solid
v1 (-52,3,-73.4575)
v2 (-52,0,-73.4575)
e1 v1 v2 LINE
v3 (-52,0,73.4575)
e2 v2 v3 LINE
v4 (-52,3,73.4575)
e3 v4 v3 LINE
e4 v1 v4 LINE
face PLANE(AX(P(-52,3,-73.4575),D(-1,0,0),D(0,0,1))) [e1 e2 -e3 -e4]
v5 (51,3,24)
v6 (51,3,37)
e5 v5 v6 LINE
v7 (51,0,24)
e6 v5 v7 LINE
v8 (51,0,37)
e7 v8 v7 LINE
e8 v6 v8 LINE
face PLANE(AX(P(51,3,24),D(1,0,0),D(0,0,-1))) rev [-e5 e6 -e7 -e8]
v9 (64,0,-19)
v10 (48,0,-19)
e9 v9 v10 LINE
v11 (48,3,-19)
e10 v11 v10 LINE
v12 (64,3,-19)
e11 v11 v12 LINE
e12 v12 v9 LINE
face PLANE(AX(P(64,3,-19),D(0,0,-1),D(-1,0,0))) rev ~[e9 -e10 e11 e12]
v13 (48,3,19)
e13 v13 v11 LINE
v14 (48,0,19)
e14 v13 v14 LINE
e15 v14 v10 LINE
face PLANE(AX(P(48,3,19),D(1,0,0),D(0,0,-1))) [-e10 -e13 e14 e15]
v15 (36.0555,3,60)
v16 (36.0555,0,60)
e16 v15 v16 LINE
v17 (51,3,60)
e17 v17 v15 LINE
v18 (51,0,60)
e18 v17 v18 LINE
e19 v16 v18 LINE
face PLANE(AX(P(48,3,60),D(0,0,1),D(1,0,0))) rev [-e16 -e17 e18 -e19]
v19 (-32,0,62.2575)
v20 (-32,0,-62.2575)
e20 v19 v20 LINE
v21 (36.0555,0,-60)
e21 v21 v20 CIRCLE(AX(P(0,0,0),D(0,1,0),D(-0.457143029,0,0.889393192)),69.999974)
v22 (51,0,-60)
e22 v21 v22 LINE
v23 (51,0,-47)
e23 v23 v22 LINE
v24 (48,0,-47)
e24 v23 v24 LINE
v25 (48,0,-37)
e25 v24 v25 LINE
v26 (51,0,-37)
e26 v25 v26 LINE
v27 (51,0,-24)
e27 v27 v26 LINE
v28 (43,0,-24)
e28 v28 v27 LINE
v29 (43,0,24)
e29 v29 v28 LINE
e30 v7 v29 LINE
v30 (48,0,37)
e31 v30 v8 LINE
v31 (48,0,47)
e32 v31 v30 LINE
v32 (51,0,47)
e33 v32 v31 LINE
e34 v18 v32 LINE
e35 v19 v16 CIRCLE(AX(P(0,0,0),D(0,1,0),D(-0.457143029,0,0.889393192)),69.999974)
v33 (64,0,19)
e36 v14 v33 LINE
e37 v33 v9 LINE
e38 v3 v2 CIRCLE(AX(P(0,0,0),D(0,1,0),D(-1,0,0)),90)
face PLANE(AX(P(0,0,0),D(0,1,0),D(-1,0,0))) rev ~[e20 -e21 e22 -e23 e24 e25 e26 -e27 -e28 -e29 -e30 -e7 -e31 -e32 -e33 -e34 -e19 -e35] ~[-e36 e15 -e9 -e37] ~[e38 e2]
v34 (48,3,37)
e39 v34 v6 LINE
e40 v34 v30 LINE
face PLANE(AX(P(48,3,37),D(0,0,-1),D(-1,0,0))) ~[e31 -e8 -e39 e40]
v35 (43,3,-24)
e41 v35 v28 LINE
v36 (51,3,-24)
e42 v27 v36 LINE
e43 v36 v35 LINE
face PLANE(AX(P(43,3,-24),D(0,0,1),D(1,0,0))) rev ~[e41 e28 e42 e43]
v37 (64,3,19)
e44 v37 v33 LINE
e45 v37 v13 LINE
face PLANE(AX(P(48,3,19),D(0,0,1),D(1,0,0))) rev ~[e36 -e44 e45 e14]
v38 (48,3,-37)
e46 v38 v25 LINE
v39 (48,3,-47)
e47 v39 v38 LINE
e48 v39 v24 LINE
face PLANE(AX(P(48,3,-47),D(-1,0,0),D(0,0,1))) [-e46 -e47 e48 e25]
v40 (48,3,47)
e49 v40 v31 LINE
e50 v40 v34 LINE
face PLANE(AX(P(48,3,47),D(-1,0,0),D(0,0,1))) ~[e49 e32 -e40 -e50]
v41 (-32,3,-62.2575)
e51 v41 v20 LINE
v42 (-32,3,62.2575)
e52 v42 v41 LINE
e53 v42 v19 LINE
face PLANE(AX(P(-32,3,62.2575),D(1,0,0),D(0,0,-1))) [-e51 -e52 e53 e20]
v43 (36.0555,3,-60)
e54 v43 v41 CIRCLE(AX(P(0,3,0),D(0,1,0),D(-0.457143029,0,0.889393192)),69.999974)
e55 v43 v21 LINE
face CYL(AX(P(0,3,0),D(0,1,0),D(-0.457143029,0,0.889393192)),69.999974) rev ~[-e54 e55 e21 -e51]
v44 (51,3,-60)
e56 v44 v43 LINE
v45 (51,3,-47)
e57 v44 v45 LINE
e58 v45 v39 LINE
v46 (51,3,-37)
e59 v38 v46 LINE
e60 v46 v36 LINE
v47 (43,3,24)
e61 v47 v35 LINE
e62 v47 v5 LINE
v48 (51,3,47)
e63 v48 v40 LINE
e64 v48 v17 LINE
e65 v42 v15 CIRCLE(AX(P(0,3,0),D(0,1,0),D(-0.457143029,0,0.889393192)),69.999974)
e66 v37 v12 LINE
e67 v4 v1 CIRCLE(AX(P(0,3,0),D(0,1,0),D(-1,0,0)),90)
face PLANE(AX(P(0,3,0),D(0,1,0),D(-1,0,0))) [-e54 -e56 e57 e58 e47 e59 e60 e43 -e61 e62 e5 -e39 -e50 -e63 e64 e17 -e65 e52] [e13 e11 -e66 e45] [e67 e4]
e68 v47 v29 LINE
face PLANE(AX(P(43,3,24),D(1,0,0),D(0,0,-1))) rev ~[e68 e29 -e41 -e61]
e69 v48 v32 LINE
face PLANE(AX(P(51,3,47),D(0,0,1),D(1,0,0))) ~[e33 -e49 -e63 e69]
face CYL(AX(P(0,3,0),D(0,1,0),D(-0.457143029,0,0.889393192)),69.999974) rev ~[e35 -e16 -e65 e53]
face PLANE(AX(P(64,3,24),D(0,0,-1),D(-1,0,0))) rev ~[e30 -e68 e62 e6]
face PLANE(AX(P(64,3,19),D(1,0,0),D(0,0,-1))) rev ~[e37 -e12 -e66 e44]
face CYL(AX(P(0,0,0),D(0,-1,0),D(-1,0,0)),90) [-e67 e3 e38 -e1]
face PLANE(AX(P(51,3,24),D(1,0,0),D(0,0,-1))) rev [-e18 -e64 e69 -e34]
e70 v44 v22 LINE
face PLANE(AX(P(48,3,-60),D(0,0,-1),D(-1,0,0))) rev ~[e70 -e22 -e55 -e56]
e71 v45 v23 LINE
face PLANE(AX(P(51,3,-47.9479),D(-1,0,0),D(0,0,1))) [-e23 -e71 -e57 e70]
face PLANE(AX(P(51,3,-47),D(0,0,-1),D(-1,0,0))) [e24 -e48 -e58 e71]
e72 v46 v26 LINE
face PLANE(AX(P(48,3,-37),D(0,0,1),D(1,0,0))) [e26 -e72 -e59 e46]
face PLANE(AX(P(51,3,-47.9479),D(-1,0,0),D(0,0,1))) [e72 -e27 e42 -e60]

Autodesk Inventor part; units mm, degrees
ref_plane "YZ Plane" through (0, 0, 0) normal (1, 0, 0) x (0, 1, 0)
ref_plane "XZ Plane" through (0, 0, 0) normal (0, 1, 0) x (-1, 0, 0)
ref_plane "XY Plane" through (0, 0, 0) normal (0, 0, 1) x (1, 0, 0)
sketch "Sketch1" plane through (0, 0, 0) normal (0, 1, 0) x (-1, 0, 0)
  circle A0 centre (0, 0) radius 90
  line L0 (55, -71.239) -> (55, 71.239)
  dimension "d0" = 180
  dimension "d1" = 55
extrude "Extrusion1" add sketch "Sketch1" along normal blind 3 contours L0 A0 picked at (6.6667, 0)
sketch "Sketch2" plane through (0, 3, 0) normal (0, 1, 0) x (1, 0, 0)
  arc A0 (-55, -71.239) -> (-55, 71.239) centre (0, 0) ccw projected
  line L0 (-52, 73.4575) -> (-52, -73.4575)
  line L1 (-55, 71.239) -> (-55, -71.239) projected
  dimension "d4" = 3
extrude "Extrusion2" cut sketch "Sketch2" against normal blind 3 contours L1 A0 L0
sketch "Sketch3" plane through (0, 3, 0) normal (0, 1, 0) x (1, 0, 0)
  line L0 (-52, 73.4575) -> (-52, -73.4575) projected
  arc A0 (-52, -73.4575) -> (-52, 73.4575) centre (0, 0) ccw projected
  line L1 (-32, -62.2575) -> (-32, 62.2575)
  arc A1 (-32, -62.2575) -> (-32, 62.2575) centre (0, 0) ccw
  dimension "d7" = 20
extrude "Extrusion3" cut sketch "Sketch3" against normal blind 3 contours L1 A1
sketch "Sketch4" plane through (0, 3, 0) normal (0, 1, 0) x (1, 0, 0)
  arc A0 (-32, -62.2575) -> (-32, 62.2575) centre (0, 0) ccw projected
  line L0 (51, -47.9479) -> (76.1643, -47.9479)
  line L1 (76.1643, -47.9479) -> (76.1643, 47.9479)
  line L2 (76.1643, 47.9479) -> (51, 47.9479)
  line L3 (51, 47.9479) -> (51, -47.9479)
  line L4 (-52, 73.4575) -> (-52, -73.4575) projected
  arc A1 (-52, -73.4575) -> (-52, 73.4575) centre (0, 0) ccw projected
  dimension "d10" = 103
extrude "Extrusion4" add sketch "Sketch4" against normal blind 3 contours L3 A0
sketch "Sketch5" plane through (0, 3, 0) normal (0, 1, 0) x (1, 0, 0)
  line L0 (48, -19) -> (64, -19)
  line L1 (64, -19) -> (64, 19)
  line L2 (64, 19) -> (48, 19)
  line L3 (48, 19) -> (48, -19)
  line L4 (-52, 73.4575) -> (-52, -73.4575) projected
  point P0 (0, 0)
  point P1 (64, 0)
  dimension "d13" = 16
  dimension "d14" = 38
  dimension "d15" = 100
extrude "Extrusion5" cut sketch "Sketch5" against normal blind 3
sketch "Sketch6" plane through (0, 3, 0) normal (0, 1, 0) x (1, 0, 0)
  line L0 (64, -24) -> (43, -24)
  line L1 (43, -24) -> (43, 24)
  line L2 (43, 24) -> (64, 24)
  line L3 (64, 24) -> (64, -24)
  line L4 (-52, 73.4575) -> (-52, -73.4575) projected
  arc A0 (-52, -73.4575) -> (-52, 73.4575) centre (0, 0) ccw projected
  line L5 (51, 19) -> (64, 19) projected
  line L6 (64, 19) -> (64, -19) projected
  line L7 (64, -19) -> (51, -19) projected
  line L8 (51, -19) -> (51, -47.9479) projected
  arc A1 (-32, -62.2575) -> (51, -47.9479) centre (0, 0) ccw projected
  line L9 (-32, -62.2575) -> (-32, 62.2575) projected
  arc A2 (51, 47.9479) -> (-32, 62.2575) centre (0, 0) ccw projected
  line L10 (51, 47.9479) -> (51, 19) projected
  line L11 (64, -19) -> (48, -19)
  line L12 (48, -19) -> (48, 19)
  line L13 (48, 19) -> (64, 19)
  line L14 (64, 19) -> (64, -19)
  line L15 (51, 19) -> (64, 19) projected
  line L16 (64, 19) -> (64, -19) projected
  dimension "d18" = 5
  dimension "d19" = 5
  dimension "d20" = 8
  dimension "d21" = 16
extrude "Extrusion6" add sketch "Sketch6" against normal blind 3 contours L0 L8 L7 L3 | L0 L1 L2 L10 L13 L12 L11 L8 | L5 L10 L2 L3
sketch "Sketch7" plane through (0, 3, 0) normal (0, 1, 0) x (1, 0, 0)
  line L0 (43, 24) -> (51, 24) projected
  line L1 (48, 24) -> (51, 24)
  line L2 (51, 24) -> (51, 60)
  line L3 (51, 60) -> (48, 60)
  line L4 (48, 60) -> (48, 24)
  line L5 (51, 47.9479) -> (51, 24) projected
  line L6 (48, 60) -> (36.0555, 60)
  line L7 (36.0555, 60) -> (36.0555, 50.951)
  line L8 (36.0555, 50.951) -> (48, 50.951)
  line L9 (48, 50.951) -> (48, 60)
  arc A0 (51, 47.9479) -> (-32, 62.2575) centre (0, 0) ccw projected
  dimension "d24" = 3
  dimension "d25" = 36
extrude "Extrusion7" cut sketch "Sketch7" against normal blind 3
sketch "Sketch8" plane through (0, 3, 0) normal (0, 1, 0) x (1, 0, 0)
  line L0 (51, 60) -> (51, 24) projected
  line L1 (51, 47) -> (48, 47)
  line L2 (48, 47) -> (48, 37)
  line L3 (48, 37) -> (51, 37)
  line L4 (51, 37) -> (51, 47)
  line L5 (36.0555, 60) -> (51, 60) projected
  point P0 (0, 0)
  dimension "d28" = 3
  dimension "d29" = 10
  dimension "d30" = 13
extrude "Extrusion8" add sketch "Sketch8" against normal blind 3
mirror "Mirror1" about plane through (0, 0, 0) normal (0, 0, 1) of "Extrusion8", "Extrusion7"
equation "\"d19\" = d18"
properties part number "suport plate"
